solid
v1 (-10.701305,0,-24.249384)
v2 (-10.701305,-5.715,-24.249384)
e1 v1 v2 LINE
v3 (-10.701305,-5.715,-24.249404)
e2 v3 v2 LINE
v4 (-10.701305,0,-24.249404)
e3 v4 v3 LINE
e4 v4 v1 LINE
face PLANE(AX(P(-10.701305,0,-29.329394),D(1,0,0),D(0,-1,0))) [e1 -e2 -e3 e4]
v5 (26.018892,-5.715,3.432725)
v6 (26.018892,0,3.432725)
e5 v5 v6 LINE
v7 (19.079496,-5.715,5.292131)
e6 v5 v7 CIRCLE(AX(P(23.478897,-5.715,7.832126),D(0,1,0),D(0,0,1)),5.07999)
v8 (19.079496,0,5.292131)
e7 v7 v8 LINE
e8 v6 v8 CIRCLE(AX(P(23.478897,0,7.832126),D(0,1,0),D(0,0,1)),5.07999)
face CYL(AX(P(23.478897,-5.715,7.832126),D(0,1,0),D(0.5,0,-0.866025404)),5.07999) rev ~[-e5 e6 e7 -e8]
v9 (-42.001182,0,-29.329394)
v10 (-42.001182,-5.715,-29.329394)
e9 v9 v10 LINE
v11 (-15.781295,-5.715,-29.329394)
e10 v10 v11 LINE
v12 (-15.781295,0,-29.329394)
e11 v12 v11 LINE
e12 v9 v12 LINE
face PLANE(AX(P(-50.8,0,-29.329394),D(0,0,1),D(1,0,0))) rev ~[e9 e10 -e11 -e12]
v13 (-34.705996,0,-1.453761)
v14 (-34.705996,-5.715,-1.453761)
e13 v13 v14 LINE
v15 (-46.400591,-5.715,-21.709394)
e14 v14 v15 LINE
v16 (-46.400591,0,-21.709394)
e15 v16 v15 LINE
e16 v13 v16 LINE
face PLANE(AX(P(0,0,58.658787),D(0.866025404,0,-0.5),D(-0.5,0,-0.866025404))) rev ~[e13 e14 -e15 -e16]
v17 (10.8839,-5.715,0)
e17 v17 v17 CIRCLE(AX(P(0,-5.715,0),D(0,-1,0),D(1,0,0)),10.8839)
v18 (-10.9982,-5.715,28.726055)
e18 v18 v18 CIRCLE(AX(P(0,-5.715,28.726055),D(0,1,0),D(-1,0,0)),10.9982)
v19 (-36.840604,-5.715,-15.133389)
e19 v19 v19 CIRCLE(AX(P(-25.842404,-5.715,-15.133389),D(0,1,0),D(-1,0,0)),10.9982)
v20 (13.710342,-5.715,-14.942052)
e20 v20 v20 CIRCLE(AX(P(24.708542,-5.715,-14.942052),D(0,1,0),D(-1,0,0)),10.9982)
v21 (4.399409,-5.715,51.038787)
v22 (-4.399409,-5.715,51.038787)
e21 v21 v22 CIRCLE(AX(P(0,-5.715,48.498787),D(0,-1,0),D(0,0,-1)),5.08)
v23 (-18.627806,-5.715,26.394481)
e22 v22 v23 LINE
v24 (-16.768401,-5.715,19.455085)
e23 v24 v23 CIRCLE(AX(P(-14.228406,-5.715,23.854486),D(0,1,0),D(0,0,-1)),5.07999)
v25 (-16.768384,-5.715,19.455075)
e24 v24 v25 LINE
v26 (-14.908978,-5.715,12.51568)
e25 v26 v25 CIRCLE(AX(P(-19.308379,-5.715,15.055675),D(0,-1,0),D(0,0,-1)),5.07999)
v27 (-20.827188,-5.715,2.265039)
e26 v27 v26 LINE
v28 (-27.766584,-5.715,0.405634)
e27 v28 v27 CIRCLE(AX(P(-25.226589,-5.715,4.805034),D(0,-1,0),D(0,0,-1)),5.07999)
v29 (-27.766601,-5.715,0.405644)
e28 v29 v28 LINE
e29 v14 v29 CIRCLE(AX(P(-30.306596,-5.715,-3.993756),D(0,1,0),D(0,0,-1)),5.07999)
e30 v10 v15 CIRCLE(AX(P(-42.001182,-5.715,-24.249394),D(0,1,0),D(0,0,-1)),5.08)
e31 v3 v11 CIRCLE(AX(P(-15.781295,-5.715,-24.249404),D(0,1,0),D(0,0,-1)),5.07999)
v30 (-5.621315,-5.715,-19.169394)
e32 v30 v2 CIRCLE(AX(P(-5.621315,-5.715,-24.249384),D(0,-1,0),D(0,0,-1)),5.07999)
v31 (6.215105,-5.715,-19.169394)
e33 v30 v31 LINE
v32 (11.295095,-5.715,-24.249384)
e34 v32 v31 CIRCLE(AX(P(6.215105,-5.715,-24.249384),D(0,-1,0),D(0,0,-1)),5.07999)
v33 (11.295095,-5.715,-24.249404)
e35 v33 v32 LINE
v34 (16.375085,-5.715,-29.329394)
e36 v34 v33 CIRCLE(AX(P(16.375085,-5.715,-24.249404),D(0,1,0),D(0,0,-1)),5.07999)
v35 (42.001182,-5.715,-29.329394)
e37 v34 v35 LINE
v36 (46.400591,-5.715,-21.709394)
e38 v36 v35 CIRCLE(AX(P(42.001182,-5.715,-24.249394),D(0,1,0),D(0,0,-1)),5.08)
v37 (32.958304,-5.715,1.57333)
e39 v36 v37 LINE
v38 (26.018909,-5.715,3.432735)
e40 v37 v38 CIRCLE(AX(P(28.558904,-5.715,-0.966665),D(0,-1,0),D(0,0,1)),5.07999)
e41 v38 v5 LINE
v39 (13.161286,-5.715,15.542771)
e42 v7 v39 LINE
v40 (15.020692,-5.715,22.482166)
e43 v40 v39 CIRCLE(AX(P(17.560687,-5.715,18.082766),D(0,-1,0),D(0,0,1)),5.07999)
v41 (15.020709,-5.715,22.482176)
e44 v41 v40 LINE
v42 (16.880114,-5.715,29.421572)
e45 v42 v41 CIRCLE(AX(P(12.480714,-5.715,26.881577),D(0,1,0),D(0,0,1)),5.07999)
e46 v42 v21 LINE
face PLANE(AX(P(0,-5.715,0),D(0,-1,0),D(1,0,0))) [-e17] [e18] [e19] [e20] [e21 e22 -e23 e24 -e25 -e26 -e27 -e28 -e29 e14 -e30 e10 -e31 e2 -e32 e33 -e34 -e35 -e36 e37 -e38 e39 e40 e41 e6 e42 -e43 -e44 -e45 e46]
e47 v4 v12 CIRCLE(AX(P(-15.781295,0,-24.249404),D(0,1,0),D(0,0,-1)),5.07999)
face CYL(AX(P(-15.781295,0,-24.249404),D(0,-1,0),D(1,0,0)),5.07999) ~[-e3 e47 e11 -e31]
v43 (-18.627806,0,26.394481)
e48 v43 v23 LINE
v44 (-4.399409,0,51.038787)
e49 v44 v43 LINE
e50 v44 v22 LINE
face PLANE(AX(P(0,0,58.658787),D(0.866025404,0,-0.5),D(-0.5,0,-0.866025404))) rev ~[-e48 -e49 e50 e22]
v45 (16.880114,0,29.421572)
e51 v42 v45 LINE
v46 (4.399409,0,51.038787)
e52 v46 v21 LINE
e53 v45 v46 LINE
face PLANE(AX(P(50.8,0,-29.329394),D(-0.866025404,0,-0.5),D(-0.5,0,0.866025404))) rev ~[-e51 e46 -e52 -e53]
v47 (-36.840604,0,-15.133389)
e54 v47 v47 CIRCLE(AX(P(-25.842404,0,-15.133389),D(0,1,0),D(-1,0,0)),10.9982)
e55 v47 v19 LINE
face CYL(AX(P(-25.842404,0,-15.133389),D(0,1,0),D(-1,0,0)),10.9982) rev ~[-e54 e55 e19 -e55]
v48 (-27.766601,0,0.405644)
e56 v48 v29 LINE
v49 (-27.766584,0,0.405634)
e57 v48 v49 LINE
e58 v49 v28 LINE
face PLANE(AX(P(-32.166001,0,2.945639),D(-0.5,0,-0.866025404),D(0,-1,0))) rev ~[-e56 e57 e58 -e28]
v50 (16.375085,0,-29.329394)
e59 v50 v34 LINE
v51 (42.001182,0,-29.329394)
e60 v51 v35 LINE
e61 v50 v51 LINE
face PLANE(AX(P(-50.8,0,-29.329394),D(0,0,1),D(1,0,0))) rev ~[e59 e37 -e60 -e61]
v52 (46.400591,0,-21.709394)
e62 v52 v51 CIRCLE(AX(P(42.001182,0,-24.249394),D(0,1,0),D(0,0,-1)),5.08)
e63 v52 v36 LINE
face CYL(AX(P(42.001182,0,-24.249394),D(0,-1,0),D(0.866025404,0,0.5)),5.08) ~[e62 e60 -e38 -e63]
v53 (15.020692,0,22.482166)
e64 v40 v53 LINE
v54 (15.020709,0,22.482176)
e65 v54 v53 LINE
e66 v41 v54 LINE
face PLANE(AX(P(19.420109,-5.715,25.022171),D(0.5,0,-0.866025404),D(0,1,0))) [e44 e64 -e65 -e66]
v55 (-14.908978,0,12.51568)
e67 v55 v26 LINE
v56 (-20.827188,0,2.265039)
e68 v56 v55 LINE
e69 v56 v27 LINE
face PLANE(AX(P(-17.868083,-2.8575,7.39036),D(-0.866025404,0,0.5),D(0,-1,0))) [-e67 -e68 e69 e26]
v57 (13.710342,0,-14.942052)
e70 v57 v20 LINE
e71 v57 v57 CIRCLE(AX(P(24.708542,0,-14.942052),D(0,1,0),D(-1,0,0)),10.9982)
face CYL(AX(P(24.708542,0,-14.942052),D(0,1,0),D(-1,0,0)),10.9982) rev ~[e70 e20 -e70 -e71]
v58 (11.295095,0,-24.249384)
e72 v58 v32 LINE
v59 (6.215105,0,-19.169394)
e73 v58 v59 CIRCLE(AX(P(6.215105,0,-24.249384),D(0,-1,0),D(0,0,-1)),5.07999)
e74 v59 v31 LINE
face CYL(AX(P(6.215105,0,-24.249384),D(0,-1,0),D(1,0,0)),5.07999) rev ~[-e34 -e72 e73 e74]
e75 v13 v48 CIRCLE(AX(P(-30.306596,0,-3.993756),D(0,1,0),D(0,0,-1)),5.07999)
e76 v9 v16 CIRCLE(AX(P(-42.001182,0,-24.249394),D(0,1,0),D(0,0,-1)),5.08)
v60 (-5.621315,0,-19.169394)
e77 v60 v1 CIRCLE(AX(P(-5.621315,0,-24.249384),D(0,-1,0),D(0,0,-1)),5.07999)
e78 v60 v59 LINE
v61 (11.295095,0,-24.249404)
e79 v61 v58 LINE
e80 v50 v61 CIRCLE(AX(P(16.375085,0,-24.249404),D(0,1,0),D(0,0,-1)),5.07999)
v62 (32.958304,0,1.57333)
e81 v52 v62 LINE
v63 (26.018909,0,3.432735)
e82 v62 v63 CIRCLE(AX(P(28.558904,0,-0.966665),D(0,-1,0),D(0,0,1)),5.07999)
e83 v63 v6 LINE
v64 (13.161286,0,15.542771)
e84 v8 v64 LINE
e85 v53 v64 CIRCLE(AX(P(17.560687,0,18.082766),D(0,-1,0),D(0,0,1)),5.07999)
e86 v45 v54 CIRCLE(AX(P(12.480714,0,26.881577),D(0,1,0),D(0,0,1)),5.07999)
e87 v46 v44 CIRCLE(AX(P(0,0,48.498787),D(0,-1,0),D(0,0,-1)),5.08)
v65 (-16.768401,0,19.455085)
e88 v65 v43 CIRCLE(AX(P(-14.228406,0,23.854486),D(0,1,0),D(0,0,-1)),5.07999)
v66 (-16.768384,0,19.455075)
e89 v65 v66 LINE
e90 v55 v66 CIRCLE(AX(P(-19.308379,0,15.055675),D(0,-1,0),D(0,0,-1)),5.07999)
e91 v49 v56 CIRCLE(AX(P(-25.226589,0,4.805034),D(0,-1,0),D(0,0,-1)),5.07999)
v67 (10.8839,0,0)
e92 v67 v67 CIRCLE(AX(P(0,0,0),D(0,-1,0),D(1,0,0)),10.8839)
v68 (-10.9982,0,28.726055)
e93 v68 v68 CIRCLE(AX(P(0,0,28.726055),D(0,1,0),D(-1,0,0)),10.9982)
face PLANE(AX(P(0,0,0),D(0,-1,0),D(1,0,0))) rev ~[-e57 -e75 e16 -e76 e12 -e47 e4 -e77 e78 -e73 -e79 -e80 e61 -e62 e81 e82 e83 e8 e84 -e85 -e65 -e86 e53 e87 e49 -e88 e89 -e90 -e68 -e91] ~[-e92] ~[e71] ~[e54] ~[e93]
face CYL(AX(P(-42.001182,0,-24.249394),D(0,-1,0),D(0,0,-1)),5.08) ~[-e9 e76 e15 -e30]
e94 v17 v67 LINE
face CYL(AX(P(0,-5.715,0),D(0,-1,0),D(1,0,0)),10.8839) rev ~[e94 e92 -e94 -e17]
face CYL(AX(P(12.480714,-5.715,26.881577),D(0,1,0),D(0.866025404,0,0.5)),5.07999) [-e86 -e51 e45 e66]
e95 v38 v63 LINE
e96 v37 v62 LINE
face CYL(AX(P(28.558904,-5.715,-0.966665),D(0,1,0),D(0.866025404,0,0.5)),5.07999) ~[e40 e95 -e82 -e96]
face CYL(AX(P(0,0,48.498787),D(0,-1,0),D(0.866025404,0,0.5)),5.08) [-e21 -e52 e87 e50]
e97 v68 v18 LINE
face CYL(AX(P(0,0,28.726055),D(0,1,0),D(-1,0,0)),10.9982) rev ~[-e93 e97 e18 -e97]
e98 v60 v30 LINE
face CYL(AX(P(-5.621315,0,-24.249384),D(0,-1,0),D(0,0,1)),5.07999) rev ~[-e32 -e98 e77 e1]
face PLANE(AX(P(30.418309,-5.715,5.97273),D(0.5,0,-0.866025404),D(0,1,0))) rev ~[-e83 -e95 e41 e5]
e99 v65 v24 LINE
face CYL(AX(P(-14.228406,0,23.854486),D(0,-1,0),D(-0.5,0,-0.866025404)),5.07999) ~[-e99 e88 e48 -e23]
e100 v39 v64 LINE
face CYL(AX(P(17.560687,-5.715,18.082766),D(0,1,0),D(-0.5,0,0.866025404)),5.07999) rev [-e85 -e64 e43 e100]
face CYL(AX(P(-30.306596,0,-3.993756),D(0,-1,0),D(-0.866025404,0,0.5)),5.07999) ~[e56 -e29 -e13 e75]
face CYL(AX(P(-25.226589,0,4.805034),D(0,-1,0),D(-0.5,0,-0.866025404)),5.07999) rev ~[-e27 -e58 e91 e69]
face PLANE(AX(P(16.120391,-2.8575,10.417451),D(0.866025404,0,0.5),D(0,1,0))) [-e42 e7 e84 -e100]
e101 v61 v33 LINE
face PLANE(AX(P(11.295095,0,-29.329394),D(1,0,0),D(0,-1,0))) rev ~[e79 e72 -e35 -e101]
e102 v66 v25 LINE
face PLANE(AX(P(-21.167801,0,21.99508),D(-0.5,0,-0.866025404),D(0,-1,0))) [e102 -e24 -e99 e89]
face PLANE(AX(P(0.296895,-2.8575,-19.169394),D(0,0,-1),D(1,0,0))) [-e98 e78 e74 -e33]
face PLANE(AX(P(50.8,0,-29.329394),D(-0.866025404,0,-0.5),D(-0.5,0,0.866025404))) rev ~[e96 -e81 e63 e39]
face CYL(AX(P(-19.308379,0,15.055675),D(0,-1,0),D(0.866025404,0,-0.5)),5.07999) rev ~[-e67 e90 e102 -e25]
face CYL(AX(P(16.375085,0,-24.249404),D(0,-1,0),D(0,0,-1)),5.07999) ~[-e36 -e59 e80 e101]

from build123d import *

# Parameters (mm, degrees)
F1_DEPTH  = 5.715
F2_R      = 10.8839
F3_DEPTH  = 25.4
F4_W      = 5.715
F4_H      = 21.9964
F5_DEPTH  = 10.16
F6_R      = 5.07999
F7_R      = 5.08
F8_W      = 5.715
F8_H      = 21.9964
F9_DEPTH  = 10.16
F10_R     = 5.07999
F11_W     = 21.9964
F11_H     = 5.715
F12_DEPTH = 10.16
F13_R     = 5.07999
F14_R     = 10.9982
F15_DEPTH = 25.4


# Not quite as in the source:
# - a fillet or chamfer is up to 0.001 mm smaller than in the source, because OpenCascade refuses the exact size


with BuildPart() as f1:
    # F0 (on Front) → F1 (new body)
    with BuildSketch(Plane.XZ):
        Polygon((-50.8, -29.3293936748), (50.8, -29.3293936748), (0, 58.6587873497), align=None)
    extrude(amount=F1_DEPTH)

    # F2 (on face) → F3 (cut)
    with BuildSketch(Plane.XZ.offset(5.715)):
        Circle(F2_R)
    extrude(amount=-F3_DEPTH, mode=Mode.SUBTRACT)

    # F4 (on face) → F5 (cut)
    with BuildSketch(Plane(origin=(25.4, 0, 14.6646968374), x_dir=(0, 1, 0), z_dir=(0.8660254038, 0, 0.5))):
        with Locations((-2.8575, 0.9615815512)):
            Rectangle(F4_W, F4_H)
    extrude(amount=-F5_DEPTH, mode=Mode.SUBTRACT)

    # F6 (radius 5.08 in the source; OpenCascade refuses exactly that, so slightly less here)
    f6_edges = [f1.edges().sort_by_distance(p)[0] for p in [
        (21.619491, -2.8575, 0.89273),
        (10.621291, -2.8575, 19.942171),
        (30.418309, -2.8575, 5.97273),
        (19.420109, -2.8575, 25.022171),
    ]]
    fillet(f6_edges, radius=F6_R)

    # F7
    f7_edges = [f1.edges().sort_by_distance(p)[0] for p in [
        (50.8, -2.8575, -29.329394),
        (-50.8, -2.8575, -29.329394),
        (0, -2.8575, 58.658787),
    ]]
    fillet(f7_edges, radius=F7_R)

    # F8 (on face) → F9 (cut)
    with BuildSketch(Plane(origin=(-25.4, 0, 14.6646968374), x_dir=(0, -1, 0), z_dir=(-0.8660254038, 0, 0.5))):
        with Locations((2.8575, -2.5338024565)):
            Rectangle(F8_W, F8_H)
    extrude(amount=-F9_DEPTH, mode=Mode.SUBTRACT)

    # F10 (radius 5.08 in the source; OpenCascade refuses exactly that, so slightly less here)
    f10_edges = [f1.edges().sort_by_distance(p)[0] for p in [
        (-21.167801, -2.8575, 21.99508),
        (-12.368983, -2.8575, 16.91508),
        (-32.166001, -2.8575, 2.945639),
        (-23.367183, -2.8575, -2.134361),
    ]]
    fillet(f10_edges, radius=F10_R)

    # F11 (on face) → F12 (cut)
    with BuildSketch(Plane(origin=(0, 0, -29.3293936748), x_dir=(1, 0, 0), z_dir=(0, 0, -1))):
        with Locations((0.2968947671, 2.8575)):
            Rectangle(F11_W, F11_H)
    extrude(amount=-F12_DEPTH, mode=Mode.SUBTRACT)

    # F13 (radius 5.08 in the source; OpenCascade refuses exactly that, so slightly less here)
    f13_edges = [f1.edges().sort_by_distance(p)[0] for p in [
        (11.295095, -2.8575, -29.329394),
        (11.295095, -2.8575, -19.169394),
        (-10.701305, -2.8575, -29.329394),
        (-10.701305, -2.8575, -19.169394),
    ]]
    fillet(f13_edges, radius=F13_R)

    # F14 (on face) → F15 (cut)
    with BuildSketch(Plane(origin=(0, 0, 0), x_dir=(-1, 0, 0), z_dir=(0, 1, 0))):
        with Locations((0, 28.7260549402)):
            Circle(F14_R)
        with Locations((25.8424041398, -15.1333886554)):
            Circle(F14_R)
        with Locations((-24.7085423876, -14.9420522576)):
            Circle(F14_R)
    extrude(amount=-F15_DEPTH, mode=Mode.SUBTRACT)


solid = f1.part
